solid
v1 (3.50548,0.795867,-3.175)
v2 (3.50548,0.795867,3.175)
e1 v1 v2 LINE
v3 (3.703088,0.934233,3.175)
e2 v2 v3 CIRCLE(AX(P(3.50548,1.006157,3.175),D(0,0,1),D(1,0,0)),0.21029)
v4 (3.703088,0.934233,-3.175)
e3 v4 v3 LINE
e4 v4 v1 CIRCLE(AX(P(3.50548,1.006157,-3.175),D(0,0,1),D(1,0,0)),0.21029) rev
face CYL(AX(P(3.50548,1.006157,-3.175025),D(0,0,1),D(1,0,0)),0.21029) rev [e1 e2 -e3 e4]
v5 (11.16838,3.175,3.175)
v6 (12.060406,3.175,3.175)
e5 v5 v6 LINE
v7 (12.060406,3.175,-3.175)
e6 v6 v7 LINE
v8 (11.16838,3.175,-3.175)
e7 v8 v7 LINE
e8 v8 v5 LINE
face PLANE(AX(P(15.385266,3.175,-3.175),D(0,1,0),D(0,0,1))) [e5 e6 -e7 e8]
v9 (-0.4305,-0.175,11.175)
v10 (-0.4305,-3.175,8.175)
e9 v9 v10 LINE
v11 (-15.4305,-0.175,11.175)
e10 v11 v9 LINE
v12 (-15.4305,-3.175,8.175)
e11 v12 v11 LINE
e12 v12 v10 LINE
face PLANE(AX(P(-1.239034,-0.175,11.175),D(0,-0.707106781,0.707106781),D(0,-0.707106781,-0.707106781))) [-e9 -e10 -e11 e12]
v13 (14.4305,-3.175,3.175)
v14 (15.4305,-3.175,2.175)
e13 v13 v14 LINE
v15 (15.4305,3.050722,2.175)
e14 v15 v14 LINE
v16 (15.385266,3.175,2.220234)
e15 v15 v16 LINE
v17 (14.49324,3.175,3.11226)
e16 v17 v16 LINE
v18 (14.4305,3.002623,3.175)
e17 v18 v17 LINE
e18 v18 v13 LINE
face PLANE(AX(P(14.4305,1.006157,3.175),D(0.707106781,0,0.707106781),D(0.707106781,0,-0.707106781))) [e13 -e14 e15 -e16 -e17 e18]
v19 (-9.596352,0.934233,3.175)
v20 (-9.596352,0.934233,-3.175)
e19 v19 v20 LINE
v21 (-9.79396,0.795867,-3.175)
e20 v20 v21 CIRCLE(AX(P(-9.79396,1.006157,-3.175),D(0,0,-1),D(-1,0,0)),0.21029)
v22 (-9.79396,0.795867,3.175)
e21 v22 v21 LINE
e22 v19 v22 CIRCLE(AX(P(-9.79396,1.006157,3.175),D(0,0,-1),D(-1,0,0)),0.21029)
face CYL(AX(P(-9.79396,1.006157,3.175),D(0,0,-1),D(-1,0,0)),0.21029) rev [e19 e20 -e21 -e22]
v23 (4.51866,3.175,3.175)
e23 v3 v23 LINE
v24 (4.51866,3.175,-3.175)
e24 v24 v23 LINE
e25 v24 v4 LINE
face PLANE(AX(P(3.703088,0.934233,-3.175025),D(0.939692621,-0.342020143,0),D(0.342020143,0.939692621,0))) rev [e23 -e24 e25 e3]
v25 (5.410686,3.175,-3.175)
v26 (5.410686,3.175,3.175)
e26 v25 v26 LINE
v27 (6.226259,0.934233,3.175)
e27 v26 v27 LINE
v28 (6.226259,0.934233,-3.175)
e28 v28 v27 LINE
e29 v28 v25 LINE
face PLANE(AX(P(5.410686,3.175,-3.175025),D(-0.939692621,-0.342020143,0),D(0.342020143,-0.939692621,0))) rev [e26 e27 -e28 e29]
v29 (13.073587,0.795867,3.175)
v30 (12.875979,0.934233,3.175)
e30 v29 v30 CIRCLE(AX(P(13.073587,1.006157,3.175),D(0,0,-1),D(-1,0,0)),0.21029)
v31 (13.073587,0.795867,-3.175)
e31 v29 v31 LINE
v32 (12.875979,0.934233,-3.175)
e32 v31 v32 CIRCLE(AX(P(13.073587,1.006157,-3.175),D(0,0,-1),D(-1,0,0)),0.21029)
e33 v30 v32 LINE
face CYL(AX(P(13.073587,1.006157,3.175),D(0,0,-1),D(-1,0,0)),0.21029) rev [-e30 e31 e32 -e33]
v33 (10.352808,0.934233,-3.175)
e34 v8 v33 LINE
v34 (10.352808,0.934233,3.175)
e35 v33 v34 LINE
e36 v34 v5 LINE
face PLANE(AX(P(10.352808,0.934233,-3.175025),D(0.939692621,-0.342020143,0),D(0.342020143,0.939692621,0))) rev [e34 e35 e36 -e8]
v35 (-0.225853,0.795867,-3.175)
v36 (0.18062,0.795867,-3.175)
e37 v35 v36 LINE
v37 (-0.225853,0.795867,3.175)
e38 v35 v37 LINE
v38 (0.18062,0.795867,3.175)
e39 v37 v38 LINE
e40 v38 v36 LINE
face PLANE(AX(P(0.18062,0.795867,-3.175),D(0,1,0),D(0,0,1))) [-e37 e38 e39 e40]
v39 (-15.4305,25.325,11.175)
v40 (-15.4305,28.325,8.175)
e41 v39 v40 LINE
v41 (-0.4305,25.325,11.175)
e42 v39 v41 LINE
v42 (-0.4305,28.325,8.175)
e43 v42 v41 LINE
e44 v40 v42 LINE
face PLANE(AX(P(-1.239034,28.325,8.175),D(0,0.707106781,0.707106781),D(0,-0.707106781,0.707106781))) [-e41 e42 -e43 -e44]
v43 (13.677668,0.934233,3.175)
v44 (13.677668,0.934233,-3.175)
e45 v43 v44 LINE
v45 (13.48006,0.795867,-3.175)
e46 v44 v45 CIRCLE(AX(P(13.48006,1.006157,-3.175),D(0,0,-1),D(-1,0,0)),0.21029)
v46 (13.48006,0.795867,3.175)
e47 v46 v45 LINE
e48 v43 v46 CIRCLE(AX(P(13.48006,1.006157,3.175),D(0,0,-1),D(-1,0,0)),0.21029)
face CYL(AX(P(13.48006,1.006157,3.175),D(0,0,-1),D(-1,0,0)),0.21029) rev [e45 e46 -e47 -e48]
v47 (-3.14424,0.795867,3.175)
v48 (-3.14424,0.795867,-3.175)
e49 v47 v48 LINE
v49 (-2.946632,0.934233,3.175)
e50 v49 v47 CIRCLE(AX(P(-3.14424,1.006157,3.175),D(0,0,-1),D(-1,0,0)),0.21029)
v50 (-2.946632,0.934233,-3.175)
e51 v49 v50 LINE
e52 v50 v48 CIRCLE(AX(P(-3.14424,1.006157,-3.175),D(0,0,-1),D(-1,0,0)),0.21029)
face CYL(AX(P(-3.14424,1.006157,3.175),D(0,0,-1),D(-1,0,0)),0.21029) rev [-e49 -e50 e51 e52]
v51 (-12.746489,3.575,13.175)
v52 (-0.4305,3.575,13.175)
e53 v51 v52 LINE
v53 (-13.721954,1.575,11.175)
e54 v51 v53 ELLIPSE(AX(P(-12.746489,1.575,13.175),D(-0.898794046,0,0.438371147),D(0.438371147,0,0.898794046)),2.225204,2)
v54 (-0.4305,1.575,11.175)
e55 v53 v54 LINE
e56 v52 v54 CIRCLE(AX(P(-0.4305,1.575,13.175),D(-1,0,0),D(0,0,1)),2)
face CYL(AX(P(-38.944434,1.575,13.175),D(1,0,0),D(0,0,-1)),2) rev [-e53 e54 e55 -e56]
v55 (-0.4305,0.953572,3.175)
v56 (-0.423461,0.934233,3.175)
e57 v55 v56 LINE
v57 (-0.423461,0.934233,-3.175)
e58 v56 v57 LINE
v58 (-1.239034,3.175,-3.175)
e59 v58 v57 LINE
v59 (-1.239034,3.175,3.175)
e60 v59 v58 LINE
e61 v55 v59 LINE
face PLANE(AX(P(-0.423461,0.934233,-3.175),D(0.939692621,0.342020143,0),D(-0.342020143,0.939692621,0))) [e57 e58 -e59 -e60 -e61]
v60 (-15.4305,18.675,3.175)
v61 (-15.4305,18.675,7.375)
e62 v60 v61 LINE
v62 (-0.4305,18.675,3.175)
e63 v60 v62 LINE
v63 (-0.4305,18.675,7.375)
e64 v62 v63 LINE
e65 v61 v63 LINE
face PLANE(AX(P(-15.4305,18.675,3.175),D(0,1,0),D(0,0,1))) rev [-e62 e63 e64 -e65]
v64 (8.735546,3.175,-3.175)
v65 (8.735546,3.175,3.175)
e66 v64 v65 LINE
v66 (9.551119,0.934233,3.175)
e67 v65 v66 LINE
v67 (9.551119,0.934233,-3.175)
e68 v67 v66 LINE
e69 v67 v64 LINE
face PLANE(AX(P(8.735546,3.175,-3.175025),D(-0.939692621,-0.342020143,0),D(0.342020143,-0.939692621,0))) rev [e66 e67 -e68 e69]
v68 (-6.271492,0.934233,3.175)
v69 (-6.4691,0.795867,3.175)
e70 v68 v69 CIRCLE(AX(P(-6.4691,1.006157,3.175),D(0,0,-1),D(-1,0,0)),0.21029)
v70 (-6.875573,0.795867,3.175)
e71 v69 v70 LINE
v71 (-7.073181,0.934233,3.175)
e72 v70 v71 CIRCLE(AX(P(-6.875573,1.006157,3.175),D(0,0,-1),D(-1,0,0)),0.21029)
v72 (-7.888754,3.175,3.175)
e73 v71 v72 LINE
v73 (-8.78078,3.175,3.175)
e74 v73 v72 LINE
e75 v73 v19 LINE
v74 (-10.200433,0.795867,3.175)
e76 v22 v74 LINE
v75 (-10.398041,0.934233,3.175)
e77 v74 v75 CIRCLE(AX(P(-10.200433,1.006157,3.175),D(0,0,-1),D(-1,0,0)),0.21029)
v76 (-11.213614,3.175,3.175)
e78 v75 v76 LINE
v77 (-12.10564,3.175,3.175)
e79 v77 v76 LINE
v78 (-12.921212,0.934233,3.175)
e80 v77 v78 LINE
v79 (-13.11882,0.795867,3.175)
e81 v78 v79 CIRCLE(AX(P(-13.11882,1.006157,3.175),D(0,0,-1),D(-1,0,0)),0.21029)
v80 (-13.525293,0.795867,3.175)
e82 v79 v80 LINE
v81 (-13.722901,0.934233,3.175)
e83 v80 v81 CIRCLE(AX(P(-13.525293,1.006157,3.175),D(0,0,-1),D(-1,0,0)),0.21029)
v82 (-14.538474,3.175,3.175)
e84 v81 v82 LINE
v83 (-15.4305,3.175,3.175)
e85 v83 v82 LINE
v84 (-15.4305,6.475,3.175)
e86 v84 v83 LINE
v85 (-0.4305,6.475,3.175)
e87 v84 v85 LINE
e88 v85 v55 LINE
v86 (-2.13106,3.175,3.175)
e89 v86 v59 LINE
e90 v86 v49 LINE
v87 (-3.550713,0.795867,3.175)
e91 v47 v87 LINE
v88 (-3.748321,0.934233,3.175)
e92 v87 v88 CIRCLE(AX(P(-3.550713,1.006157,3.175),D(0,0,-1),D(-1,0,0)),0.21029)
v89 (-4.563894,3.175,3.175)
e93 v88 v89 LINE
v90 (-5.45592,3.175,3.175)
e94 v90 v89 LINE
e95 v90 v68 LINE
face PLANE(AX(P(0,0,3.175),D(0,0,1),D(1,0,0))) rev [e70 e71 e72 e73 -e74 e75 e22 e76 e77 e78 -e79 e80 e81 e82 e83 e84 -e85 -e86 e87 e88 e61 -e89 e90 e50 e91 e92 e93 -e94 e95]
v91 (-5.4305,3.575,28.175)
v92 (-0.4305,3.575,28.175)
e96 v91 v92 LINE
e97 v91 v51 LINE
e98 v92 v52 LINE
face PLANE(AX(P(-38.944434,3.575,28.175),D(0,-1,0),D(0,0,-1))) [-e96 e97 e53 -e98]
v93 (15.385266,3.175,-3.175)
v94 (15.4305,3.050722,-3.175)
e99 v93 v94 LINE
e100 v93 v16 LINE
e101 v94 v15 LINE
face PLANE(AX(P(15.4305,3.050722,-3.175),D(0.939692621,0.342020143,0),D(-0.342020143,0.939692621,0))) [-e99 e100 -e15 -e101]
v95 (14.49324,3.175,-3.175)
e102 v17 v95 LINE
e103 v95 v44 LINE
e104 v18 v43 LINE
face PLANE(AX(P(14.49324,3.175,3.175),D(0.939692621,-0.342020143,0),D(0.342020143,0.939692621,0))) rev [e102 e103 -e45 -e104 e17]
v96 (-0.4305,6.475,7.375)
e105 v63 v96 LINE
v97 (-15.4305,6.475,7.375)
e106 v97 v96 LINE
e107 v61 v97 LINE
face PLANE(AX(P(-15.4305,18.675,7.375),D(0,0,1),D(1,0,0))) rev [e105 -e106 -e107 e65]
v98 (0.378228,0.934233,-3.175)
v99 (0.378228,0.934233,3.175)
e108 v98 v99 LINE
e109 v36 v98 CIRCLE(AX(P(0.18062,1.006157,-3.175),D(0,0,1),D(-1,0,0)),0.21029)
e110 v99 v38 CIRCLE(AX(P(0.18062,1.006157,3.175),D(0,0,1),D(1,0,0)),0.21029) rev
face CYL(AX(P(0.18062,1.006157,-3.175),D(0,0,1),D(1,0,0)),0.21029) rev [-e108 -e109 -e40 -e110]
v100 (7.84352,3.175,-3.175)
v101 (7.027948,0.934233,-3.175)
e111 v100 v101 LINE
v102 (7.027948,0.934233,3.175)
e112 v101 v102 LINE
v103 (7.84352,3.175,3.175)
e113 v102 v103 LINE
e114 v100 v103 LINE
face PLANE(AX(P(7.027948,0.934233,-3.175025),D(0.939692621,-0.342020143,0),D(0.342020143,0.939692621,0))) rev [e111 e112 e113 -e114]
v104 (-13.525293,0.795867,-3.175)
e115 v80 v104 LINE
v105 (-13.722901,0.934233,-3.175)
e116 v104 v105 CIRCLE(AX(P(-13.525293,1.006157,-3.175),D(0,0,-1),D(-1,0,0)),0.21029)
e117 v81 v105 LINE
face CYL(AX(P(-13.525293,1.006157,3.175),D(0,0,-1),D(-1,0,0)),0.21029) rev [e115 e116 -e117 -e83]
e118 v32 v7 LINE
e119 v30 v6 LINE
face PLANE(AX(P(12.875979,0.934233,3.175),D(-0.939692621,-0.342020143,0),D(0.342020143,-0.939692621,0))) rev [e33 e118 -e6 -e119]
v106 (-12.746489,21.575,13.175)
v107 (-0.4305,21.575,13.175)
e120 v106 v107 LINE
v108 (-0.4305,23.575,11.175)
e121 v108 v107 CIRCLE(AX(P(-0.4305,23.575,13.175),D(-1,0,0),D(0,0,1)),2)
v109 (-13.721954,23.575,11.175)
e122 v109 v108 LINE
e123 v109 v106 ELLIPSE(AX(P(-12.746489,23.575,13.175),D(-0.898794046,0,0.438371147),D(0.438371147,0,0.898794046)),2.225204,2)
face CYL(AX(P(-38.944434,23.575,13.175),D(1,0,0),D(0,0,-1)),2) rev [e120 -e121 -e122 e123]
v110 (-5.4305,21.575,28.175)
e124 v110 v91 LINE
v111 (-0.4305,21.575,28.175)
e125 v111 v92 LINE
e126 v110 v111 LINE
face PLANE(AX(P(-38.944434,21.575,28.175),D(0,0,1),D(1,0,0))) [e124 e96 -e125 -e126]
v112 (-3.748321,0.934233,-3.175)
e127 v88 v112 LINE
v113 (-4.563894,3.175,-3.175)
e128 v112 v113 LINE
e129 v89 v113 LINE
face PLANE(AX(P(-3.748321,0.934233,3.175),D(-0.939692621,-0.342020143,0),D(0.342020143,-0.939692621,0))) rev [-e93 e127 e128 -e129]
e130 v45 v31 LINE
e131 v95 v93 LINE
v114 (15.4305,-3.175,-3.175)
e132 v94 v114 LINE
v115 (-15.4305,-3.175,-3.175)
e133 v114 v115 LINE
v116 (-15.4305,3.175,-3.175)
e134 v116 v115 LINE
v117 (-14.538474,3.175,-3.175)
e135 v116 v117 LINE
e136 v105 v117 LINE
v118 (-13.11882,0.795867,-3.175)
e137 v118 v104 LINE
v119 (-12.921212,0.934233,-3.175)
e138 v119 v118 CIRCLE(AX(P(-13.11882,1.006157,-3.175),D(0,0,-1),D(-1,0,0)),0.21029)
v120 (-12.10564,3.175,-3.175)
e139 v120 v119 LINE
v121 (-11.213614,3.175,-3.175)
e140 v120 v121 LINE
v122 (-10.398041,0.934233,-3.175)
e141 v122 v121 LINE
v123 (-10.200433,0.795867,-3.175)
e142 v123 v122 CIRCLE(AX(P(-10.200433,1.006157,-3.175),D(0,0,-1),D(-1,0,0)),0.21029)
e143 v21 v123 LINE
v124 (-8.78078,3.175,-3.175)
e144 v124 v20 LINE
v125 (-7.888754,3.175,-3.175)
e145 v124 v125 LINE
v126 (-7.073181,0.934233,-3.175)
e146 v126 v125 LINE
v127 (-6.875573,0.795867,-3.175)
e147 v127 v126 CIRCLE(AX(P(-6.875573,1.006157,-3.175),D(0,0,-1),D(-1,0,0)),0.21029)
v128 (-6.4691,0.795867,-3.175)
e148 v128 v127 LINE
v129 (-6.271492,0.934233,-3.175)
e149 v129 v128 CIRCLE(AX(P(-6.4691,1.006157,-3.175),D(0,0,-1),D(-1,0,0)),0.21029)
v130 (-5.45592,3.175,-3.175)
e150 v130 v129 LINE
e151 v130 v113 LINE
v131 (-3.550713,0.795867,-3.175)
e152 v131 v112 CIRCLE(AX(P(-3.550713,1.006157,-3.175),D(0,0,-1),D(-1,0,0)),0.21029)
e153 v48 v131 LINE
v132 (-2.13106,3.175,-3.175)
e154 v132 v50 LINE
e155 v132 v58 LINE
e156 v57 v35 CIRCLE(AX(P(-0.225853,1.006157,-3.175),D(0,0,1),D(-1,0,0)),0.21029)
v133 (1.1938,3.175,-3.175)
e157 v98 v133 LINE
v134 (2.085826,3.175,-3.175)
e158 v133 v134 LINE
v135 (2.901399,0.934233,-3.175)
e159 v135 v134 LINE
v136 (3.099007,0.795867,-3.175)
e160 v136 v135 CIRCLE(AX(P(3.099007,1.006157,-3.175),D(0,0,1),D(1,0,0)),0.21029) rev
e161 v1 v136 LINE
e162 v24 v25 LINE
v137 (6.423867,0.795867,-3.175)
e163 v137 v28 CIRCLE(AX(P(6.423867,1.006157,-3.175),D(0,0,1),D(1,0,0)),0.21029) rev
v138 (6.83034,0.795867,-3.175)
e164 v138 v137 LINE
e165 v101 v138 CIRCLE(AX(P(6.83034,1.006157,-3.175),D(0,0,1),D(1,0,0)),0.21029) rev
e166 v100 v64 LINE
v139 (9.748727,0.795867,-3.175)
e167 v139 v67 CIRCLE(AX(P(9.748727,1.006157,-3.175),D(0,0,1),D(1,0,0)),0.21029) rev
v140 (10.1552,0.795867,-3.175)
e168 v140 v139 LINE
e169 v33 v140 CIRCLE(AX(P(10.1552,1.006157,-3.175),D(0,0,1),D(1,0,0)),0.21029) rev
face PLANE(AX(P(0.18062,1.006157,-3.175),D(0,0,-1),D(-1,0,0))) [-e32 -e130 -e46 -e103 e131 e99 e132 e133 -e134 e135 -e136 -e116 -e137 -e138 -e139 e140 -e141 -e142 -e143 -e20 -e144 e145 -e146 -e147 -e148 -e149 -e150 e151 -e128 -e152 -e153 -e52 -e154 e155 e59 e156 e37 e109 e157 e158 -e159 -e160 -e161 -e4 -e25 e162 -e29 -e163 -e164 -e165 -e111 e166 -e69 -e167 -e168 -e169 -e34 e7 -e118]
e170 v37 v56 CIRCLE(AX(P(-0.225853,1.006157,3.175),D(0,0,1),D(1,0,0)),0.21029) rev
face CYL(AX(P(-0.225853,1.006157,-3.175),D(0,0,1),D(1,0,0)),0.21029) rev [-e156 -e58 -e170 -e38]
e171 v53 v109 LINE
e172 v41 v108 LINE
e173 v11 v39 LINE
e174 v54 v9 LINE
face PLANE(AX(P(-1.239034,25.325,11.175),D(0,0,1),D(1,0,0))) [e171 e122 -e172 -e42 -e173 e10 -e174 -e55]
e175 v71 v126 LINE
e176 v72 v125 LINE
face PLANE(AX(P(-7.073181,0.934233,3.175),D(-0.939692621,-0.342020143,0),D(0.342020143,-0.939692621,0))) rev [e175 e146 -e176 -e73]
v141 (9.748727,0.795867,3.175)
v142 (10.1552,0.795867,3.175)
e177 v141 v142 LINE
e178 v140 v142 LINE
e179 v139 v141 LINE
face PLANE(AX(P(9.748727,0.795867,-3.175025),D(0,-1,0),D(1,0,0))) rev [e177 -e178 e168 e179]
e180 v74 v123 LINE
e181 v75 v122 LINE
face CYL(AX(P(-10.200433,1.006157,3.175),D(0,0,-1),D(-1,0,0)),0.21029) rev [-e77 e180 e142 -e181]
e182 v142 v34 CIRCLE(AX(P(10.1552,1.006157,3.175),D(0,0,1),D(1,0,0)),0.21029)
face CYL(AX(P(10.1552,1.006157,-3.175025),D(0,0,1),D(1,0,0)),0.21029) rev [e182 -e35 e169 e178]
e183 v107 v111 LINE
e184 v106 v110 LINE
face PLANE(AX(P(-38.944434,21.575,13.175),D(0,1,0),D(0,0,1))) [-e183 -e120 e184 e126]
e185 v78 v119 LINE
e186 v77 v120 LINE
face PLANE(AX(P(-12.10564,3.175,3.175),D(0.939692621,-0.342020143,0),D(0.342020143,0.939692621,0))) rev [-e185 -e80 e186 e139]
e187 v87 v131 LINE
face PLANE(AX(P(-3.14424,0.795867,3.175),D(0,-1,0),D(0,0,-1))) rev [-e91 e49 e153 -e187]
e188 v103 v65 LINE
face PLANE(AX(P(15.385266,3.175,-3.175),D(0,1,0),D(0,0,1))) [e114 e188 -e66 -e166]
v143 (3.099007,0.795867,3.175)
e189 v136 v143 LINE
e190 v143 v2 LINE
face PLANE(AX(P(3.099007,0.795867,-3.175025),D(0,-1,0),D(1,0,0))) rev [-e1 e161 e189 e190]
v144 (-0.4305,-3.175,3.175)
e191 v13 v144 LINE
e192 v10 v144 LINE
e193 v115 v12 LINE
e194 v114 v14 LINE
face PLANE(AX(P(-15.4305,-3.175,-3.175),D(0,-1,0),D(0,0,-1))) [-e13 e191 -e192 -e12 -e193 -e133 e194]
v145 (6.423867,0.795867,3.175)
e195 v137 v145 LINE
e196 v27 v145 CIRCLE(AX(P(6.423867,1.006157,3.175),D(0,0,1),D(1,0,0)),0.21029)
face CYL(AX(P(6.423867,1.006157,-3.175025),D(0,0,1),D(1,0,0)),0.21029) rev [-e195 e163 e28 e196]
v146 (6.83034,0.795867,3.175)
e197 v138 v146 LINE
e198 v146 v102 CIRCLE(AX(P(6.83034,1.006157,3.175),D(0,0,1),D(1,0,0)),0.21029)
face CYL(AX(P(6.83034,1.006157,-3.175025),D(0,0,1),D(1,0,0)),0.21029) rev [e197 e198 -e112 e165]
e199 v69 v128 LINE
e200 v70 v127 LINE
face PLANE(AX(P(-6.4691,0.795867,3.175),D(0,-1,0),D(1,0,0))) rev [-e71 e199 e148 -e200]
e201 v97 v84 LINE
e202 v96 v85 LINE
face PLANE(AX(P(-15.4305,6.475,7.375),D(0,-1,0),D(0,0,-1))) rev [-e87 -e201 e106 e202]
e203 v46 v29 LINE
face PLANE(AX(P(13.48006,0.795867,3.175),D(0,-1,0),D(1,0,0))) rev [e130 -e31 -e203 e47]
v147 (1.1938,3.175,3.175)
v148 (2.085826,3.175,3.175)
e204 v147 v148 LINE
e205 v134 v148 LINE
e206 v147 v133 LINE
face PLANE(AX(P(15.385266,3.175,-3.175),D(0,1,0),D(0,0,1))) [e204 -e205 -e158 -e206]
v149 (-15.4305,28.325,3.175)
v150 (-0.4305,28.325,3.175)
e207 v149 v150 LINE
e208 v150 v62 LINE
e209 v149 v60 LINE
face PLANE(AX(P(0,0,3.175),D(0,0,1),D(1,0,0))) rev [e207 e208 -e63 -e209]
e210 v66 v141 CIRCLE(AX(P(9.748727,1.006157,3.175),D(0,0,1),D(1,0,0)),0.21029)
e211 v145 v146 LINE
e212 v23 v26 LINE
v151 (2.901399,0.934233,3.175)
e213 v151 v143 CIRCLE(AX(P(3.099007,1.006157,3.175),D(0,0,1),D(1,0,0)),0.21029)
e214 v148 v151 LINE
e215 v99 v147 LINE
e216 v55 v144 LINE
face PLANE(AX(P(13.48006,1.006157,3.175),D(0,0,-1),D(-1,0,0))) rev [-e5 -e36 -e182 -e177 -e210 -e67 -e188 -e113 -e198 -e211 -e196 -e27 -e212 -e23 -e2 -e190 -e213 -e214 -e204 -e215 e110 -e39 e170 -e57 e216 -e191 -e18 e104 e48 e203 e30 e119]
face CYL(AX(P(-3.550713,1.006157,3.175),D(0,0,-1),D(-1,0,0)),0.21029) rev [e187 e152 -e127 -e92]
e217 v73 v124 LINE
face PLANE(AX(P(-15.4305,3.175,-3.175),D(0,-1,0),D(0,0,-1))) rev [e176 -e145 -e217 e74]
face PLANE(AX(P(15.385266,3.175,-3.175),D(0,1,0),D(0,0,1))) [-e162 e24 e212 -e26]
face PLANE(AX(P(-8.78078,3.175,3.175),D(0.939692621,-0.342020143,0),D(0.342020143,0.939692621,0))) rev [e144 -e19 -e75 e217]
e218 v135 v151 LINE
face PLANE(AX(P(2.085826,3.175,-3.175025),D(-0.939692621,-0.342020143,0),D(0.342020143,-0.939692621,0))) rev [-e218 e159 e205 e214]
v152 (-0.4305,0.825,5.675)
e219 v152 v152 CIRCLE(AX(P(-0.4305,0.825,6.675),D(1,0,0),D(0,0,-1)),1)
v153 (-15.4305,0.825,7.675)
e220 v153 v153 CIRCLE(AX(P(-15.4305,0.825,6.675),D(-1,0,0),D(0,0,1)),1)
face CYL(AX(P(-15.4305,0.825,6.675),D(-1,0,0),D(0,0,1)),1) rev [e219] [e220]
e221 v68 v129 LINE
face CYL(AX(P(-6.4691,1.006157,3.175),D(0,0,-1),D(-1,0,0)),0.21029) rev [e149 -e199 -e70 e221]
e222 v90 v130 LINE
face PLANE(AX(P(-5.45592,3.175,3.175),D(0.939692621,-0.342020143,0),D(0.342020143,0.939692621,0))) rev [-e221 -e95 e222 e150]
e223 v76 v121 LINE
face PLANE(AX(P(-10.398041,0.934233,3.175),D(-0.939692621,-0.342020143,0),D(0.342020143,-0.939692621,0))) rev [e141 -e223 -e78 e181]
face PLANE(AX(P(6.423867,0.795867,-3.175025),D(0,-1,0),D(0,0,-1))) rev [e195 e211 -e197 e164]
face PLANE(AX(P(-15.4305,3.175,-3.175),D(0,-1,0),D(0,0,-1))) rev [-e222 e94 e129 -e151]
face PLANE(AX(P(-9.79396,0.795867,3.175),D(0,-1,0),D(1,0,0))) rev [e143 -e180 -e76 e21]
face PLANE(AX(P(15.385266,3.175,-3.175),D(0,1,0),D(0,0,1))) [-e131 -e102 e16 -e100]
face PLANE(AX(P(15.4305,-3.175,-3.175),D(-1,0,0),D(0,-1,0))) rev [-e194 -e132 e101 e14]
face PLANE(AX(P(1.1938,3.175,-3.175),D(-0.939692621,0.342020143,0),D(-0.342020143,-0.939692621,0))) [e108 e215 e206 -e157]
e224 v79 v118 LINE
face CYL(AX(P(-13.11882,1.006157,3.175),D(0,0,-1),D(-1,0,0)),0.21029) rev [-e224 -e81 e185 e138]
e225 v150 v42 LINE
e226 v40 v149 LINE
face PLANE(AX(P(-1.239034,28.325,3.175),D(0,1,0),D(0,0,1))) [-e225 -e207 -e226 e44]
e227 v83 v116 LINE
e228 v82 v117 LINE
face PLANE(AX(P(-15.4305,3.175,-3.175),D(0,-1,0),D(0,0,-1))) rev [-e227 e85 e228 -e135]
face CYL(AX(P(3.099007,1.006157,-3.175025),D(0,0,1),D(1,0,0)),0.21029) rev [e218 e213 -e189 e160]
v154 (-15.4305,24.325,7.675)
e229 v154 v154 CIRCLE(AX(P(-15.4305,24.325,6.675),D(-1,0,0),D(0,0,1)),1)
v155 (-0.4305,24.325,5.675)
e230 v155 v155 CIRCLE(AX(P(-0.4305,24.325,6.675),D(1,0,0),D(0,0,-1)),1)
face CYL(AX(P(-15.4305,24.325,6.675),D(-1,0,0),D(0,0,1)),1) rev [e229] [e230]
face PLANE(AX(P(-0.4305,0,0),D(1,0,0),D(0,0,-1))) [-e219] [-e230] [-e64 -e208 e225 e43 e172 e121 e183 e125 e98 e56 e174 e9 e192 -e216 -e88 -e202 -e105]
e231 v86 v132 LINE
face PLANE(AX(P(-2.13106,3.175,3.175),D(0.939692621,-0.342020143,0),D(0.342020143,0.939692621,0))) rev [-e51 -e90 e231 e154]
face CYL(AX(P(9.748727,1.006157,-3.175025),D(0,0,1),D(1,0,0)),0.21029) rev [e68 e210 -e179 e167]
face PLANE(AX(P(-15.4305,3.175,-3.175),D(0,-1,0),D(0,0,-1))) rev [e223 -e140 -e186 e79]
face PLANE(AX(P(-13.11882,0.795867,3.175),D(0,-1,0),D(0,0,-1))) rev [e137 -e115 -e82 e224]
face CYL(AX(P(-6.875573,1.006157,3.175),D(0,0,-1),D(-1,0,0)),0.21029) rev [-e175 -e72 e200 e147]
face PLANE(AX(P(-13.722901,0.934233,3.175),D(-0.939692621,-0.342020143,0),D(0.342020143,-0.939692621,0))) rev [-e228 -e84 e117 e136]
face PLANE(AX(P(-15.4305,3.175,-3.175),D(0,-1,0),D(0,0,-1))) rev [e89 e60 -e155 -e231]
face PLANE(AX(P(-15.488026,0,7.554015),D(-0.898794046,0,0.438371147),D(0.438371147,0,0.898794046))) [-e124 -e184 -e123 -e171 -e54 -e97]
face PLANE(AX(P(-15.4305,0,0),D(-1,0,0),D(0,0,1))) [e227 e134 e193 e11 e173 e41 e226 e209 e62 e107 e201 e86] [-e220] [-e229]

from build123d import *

# Parameters (mm, degrees)
BOSS_EXTRUDE1_START       = -0.808533663
BOSS_EXTRUDE1_DEPTH       = 0.808533663
BOSS_EXTRUDE1_START_2     = 0.611119732
BOSS_EXTRUDE1_2_OUTLINE_W = 1
BOSS_EXTRUDE1_2_OUTLINE_H = 6.35
BOSS_EXTRUDE1_2_DEPTH     = 15.249880268
BOSS_EXTRUDE1_3_OUTLINE_W = 1
BOSS_EXTRUDE1_3_OUTLINE_H = 3.970866667
BOSS_EXTRUDE1_3_DEPTH     = 0.80872757
BOSS_EXTRUDE1_4_OUTLINE_W = 1
BOSS_EXTRUDE1_4_OUTLINE_H = 2.379133333
BOSS_EXTRUDE1_4_DEPTH     = 0.204646605
BOSS_EXTRUDE1_START_3     = 2.175
BOSS_EXTRUDE1_5_DEPTH     = 6
BOSS_EXTRUDE1_START_4     = 12.448968436
BOSS_EXTRUDE1_6_OUTLINE_W = 5
BOSS_EXTRUDE1_6_OUTLINE_H = 8.175
BOSS_EXTRUDE1_6_DEPTH     = 1.551031564
BOSS_EXTRUDE2_START       = 5.35
BOSS_EXTRUDE2_DEPTH       = 5.35
CUT_EXTRUDE1_DEPTH        = 6.35
BOSS_EXTRUDE3_DEPTH       = 14.191466337
BOSS_EXTRUDE4_REACH       = 36.333
CUT_EXTRUDE2_DEPTH        = 6.35
CUT_EXTRUDE3_DEPTH        = 6.35
CUT_EXTRUDE4_DEPTH        = 6.35
CUT_EXTRUDE5_DEPTH        = 6.35
CUT_EXTRUDE6_DEPTH        = 6.35
CUT_EXTRUDE7_DEPTH        = 41.809385627
CUT_EXTRUDE8_DEPTH        = 41.809385627
CUT_EXTRUDE9_DEPTH        = 41.809385627
SKETCH15_W                = 4.2
SKETCH15_H                = 12.2
CUT_EXTRUDE10_DEPTH       = 43.984969129
F_3_CLEARANCE_HOLE1_D     = 2
F_3_CLEARANCE_HOLE1_DEPTH = 30.861103078


with BuildPart() as part:
    # Boss-Extrude1: read off the stored shape, not the designer's step
    # Boss-Extrude1 outline → Boss-Extrude1 (new body)
    with BuildSketch(Plane(origin=(-0.4305, 0, 0), x_dir=(0, 0, -1), z_dir=(1, 0, 0)).offset(BOSS_EXTRUDE1_START)):
        Polygon((-11.175, -0.175), (-8.175, -3.175), (-2.175, -3.175), (-2.175, 28.325), (-8.175, 28.325), (-11.175, 25.325), align=None)
    extrude(amount=BOSS_EXTRUDE1_DEPTH)



with BuildPart() as body_2:
    # Boss-Extrude1 2 outline → Boss-Extrude1 2 (new body)
    with BuildSketch(Plane(origin=(-0.4305, 0, 0), x_dir=(0, 0, -1), z_dir=(1, 0, 0)).offset(BOSS_EXTRUDE1_START_2)):
        with Locations((-2.675, 0)):
            Rectangle(BOSS_EXTRUDE1_2_OUTLINE_W, BOSS_EXTRUDE1_2_OUTLINE_H)
    extrude(amount=BOSS_EXTRUDE1_2_DEPTH)


with BuildPart() as part_1:
    add(part.part)

    add(body_2.part)  # Boss-Extrude1 3 merges body 2
    # Boss-Extrude1 3 outline → Boss-Extrude1 3 (add)
    with BuildSketch(Plane(origin=(-0.4305, 0, 0), x_dir=(0, 0, -1), z_dir=(1, 0, 0))):
        with Locations((-2.675, -1.189566667)):
            Rectangle(BOSS_EXTRUDE1_3_OUTLINE_W, BOSS_EXTRUDE1_3_OUTLINE_H)
    extrude(amount=BOSS_EXTRUDE1_3_DEPTH)

    # Boss-Extrude1 4 outline → Boss-Extrude1 4 (add)
    with BuildSketch(Plane(origin=(-0.4305, 0, 0), x_dir=(0, 0, -1), z_dir=(1, 0, 0))):
        with Locations((-2.675, 1.985433334)):
            Rectangle(BOSS_EXTRUDE1_4_OUTLINE_W, BOSS_EXTRUDE1_4_OUTLINE_H)
    extrude(amount=BOSS_EXTRUDE1_4_DEPTH)

    # Boss-Extrude1 5 outline → Boss-Extrude1 5 (cut)
    with BuildSketch(Plane.XY.offset(BOSS_EXTRUDE1_START_3)):
        with BuildLine():
            Line((0.37822757, 0.934233164), (1.1938, 3.175))
            Line((1.1938, 3.175), (0.180619732, 3.175))
            Line((0.180619732, 3.175), (0.180619732, 0.795866667))
            ThreePointArc((0.180619732, 0.795866667), (0.301237045, 0.83389716), (0.37822757, 0.934233164))
        make_face()
        Polygon((15.385266337, 3.175), (15.4305, 3.050721534), (15.4305, 3.175), align=None)
        with BuildLine():
            Line((-0.4305, 0.953572019), (-0.423461232, 0.934233164))
            ThreePointArc((-0.423461232, 0.934233164), (-0.346470708, 0.83389716), (-0.225853395, 0.795866667))
            Line((-0.225853395, 0.795866667), (-0.225853395, 3.175))
            Line((-0.225853395, 3.175), (-0.4305, 3.175))
            Line((-0.4305, 3.175), (-0.4305, 0.953572019))
        make_face()
    extrude(amount=BOSS_EXTRUDE1_5_DEPTH, mode=Mode.SUBTRACT)

    # Boss-Extrude1 6 outline → Boss-Extrude1 6 (cut)
    with BuildSketch(Plane(origin=(0, 0, 0), x_dir=(0.707106781186545, 0, -0.70710678118655), z_dir=(0.70710678118655, 0, 0.707106781186545)).offset(BOSS_EXTRUDE1_START_4)):
        with Locations((8.5, 0.9125)):
            Rectangle(BOSS_EXTRUDE1_6_OUTLINE_W, BOSS_EXTRUDE1_6_OUTLINE_H)
    extrude(amount=BOSS_EXTRUDE1_6_DEPTH, mode=Mode.SUBTRACT)

    # Sketch2 → Boss-Extrude2 (add)
    with BuildSketch(Plane(origin=(0, 0, 2.175), x_dir=(-1, 0, 0), z_dir=(0, 0, -1)).offset(BOSS_EXTRUDE2_START)):
        with BuildLine():
            Line((1.239033663, -3.175), (-15.4305, -3.175))
            Line((-15.4305, -3.175), (-15.4305, 3.050721534))
            Line((-15.4305, 3.050721534), (-15.385266337, 3.175))
            Line((-15.385266337, 3.175), (-1.1938, 3.175))
            Line((-1.1938, 3.175), (-0.37822757, 0.934233164))
            ThreePointArc((-0.37822757, 0.934233164), (-0.301237046, 0.83389716), (-0.180619732, 0.795866667))
            Line((-0.180619732, 0.795866667), (0.225853395, 0.795866667))
            ThreePointArc((0.225853395, 0.795866667), (0.346470708, 0.83389716), (0.423461232, 0.934233164))
            Line((0.423461232, 0.934233164), (0.4305, 0.953572019))
            Line((0.4305, 0.953572019), (0.4305, 28.325))
            Line((0.4305, 28.325), (1.239033663, 28.325))
            Line((1.239033663, 28.325), (1.239033663, -3.175))
        make_face()
    extrude(amount=-BOSS_EXTRUDE2_DEPTH)

    # Sketch3 → Cut-Extrude1 (cut)
    with BuildSketch(Plane(origin=(0, 0, -3.175), x_dir=(-1, 0, 0), z_dir=(0, 0, -1))):
        Polygon((0.4305, 0.953572019), (1.239033663, 3.175), (1.239033663, 28.325), (0.4305, 28.325), align=None)
    extrude(amount=-CUT_EXTRUDE1_DEPTH, mode=Mode.SUBTRACT)

    # Sketch4 → Boss-Extrude3 (add)
    with BuildSketch(Plane.ZY.offset(1.239033663)):
        Polygon((3.175, 3.175), (3.175, 28.325), (8.175, 28.325), (11.175, 25.325), (11.175, -0.175), (8.175, -3.175), (-3.175, -3.175), (-3.175, 3.175), align=None)
    extrude(amount=BOSS_EXTRUDE3_DEPTH)

    # Boss-Extrude4: up to this plane
    boss_extrude4_end = Plane(origin=(-15.488026312, 0, 7.554015165), z_dir=(-0.8987940462991697, 0, 0.438371146789072))
    # Sketch6 → Boss-Extrude4 (add, up to the surface)
    with BuildSketch(Plane(origin=(-0.4305, 0, 0), x_dir=(0, 0, -1), z_dir=(1, 0, 0)), mode=Mode.PRIVATE) as boss_extrude4_sk1:
        with BuildLine():
            Line((-11.175, 1.575), (-11.175, 23.575))
            ThreePointArc((-11.175, 23.575), (-11.760786438, 22.160786438), (-13.175, 21.575))
            Line((-13.175, 21.575), (-28.175, 21.575))
            Line((-28.175, 21.575), (-28.175, 3.575))
            Line((-28.175, 3.575), (-13.175, 3.575))
            ThreePointArc((-13.175, 3.575), (-11.760786438, 2.989213562), (-11.175, 1.575))
        make_face()
    boss_extrude4_tool1 = split(extrude(boss_extrude4_sk1.sketch, amount=-BOSS_EXTRUDE4_REACH, mode=Mode.PRIVATE), bisect_by=boss_extrude4_end, keep=Keep.BOTH, mode=Mode.PRIVATE)
    add(boss_extrude4_tool1.solids().sort_by_distance((-0.4305, 12.575, 19.630069))[0])

    # Sketch7 → Cut-Extrude2 (cut)
    with BuildSketch(Plane(origin=(0, 0, -3.175), x_dir=(-1, 0, 0), z_dir=(0, 0, -1))):
        with BuildLine():
            Line((2.13106, 3.175), (2.94663243, 0.934233164))
            ThreePointArc((2.94663243, 0.934233164), (3.023622954, 0.83389716), (3.144240268, 0.795866667))
            Line((3.144240268, 0.795866667), (3.550713395, 0.795866667))
            ThreePointArc((3.550713395, 0.795866667), (3.671330708, 0.83389716), (3.748321232, 0.934233164))
            Line((3.748321232, 0.934233164), (4.563893663, 3.175))
            Line((4.563893663, 3.175), (2.13106, 3.175))
        make_face()
    extrude(amount=-CUT_EXTRUDE2_DEPTH, mode=Mode.SUBTRACT)

    # Sketch8 → Cut-Extrude3 (cut)
    with BuildSketch(Plane(origin=(0, 0, -3.175), x_dir=(-1, 0, 0), z_dir=(0, 0, -1))):
        with BuildLine():
            Line((5.45592, 3.175), (6.27149243, 0.934233164))
            ThreePointArc((6.27149243, 0.934233164), (6.348482954, 0.83389716), (6.469100268, 0.795866667))
            Line((6.469100268, 0.795866667), (6.875573395, 0.795866667))
            ThreePointArc((6.875573395, 0.795866667), (6.996190708, 0.83389716), (7.073181232, 0.934233164))
            Line((7.073181232, 0.934233164), (7.888753663, 3.175))
            Line((7.888753663, 3.175), (5.45592, 3.175))
        make_face()
    extrude(amount=-CUT_EXTRUDE3_DEPTH, mode=Mode.SUBTRACT)

    # Sketch9 → Cut-Extrude4 (cut)
    with BuildSketch(Plane(origin=(0, 0, -3.175), x_dir=(-1, 0, 0), z_dir=(0, 0, -1))):
        with BuildLine():
            Line((8.78078, 3.175), (9.59635243, 0.934233164))
            ThreePointArc((9.59635243, 0.934233164), (9.673342954, 0.83389716), (9.793960268, 0.795866667))
            Line((9.793960268, 0.795866667), (10.200433395, 0.795866667))
            ThreePointArc((10.200433395, 0.795866667), (10.321050708, 0.83389716), (10.398041232, 0.934233164))
            Line((10.398041232, 0.934233164), (11.213613663, 3.175))
            Line((11.213613663, 3.175), (8.78078, 3.175))
        make_face()
    extrude(amount=-CUT_EXTRUDE4_DEPTH, mode=Mode.SUBTRACT)

    # Sketch10 → Cut-Extrude5 (cut)
    with BuildSketch(Plane(origin=(0, 0, -3.175), x_dir=(-1, 0, 0), z_dir=(0, 0, -1))):
        with BuildLine():
            Line((12.10564, 3.175), (12.92121243, 0.934233164))
            ThreePointArc((12.92121243, 0.934233164), (12.998202954, 0.83389716), (13.118820268, 0.795866667))
            Line((13.118820268, 0.795866667), (13.525293395, 0.795866667))
            ThreePointArc((13.525293395, 0.795866667), (13.645910708, 0.83389716), (13.722901232, 0.934233164))
            Line((13.722901232, 0.934233164), (14.538473663, 3.175))
            Line((14.538473663, 3.175), (12.10564, 3.175))
        make_face()
    extrude(amount=-CUT_EXTRUDE5_DEPTH, mode=Mode.SUBTRACT)

    # Sketch11 → Cut-Extrude6 (cut)
    with BuildSketch(Plane(origin=(0, 0, -3.175), x_dir=(-1, 0, 0), z_dir=(0, 0, -1))):
        with BuildLine():
            Line((-12.060406337, 3.175), (-14.49324, 3.175))
            Line((-14.49324, 3.175), (-13.67766757, 0.934233164))
            ThreePointArc((-13.67766757, 0.934233164), (-13.600677046, 0.83389716), (-13.480059732, 0.795866667))
            Line((-13.480059732, 0.795866667), (-13.073586605, 0.795866667))
            ThreePointArc((-13.073586605, 0.795866667), (-12.952969292, 0.83389716), (-12.875978768, 0.934233164))
            Line((-12.875978768, 0.934233164), (-12.060406337, 3.175))
        make_face()
    extrude(amount=-CUT_EXTRUDE6_DEPTH, mode=Mode.SUBTRACT)

    # Sketch12 → Cut-Extrude7 (cut, through all)
    with BuildSketch(Plane.XY.offset(3.175)):
        with BuildLine():
            Line((2.085826337, 3.175), (2.901398768, 0.934233164))
            ThreePointArc((2.901398768, 0.934233164), (2.978389292, 0.83389716), (3.099006605, 0.795866667))
            Line((3.099006605, 0.795866667), (3.505479732, 0.795866667))
            ThreePointArc((3.505479732, 0.795866667), (3.626097046, 0.83389716), (3.70308757, 0.934233164))
            Line((3.70308757, 0.934233164), (4.51866, 3.175))
            Line((4.51866, 3.175), (2.085826337, 3.175))
        make_face()
    extrude(amount=-CUT_EXTRUDE7_DEPTH, mode=Mode.SUBTRACT)

    # Sketch13 → Cut-Extrude8 (cut, through all)
    with BuildSketch(Plane.XY.offset(3.175)):
        with BuildLine():
            Line((5.410686337, 3.175), (6.226258768, 0.934233164))
            ThreePointArc((6.226258768, 0.934233164), (6.303249292, 0.83389716), (6.423866605, 0.795866667))
            Line((6.423866605, 0.795866667), (6.830339732, 0.795866667))
            ThreePointArc((6.830339732, 0.795866667), (6.950957046, 0.83389716), (7.02794757, 0.934233164))
            Line((7.02794757, 0.934233164), (7.84352, 3.175))
            Line((7.84352, 3.175), (5.410686337, 3.175))
        make_face()
    extrude(amount=-CUT_EXTRUDE8_DEPTH, mode=Mode.SUBTRACT)

    # Sketch14 → Cut-Extrude9 (cut, through all)
    with BuildSketch(Plane.XY.offset(3.175)):
        with BuildLine():
            Line((8.735546337, 3.175), (9.551118768, 0.934233164))
            ThreePointArc((9.551118768, 0.934233164), (9.628109292, 0.83389716), (9.748726605, 0.795866667))
            Line((9.748726605, 0.795866667), (10.155199732, 0.795866667))
            ThreePointArc((10.155199732, 0.795866667), (10.275817046, 0.83389716), (10.35280757, 0.934233164))
            Line((10.35280757, 0.934233164), (11.16838, 3.175))
            Line((11.16838, 3.175), (8.735546337, 3.175))
        make_face()
    extrude(amount=-CUT_EXTRUDE9_DEPTH, mode=Mode.SUBTRACT)

    # Sketch15 → Cut-Extrude10 (cut, through all)
    with BuildSketch(Plane(origin=(-0.4305, 0, 0), x_dir=(0, 0, -1), z_dir=(1, 0, 0))):
        with Locations((-5.275, 12.575)):
            Rectangle(SKETCH15_W, SKETCH15_H)
    extrude(amount=-CUT_EXTRUDE10_DEPTH, mode=Mode.SUBTRACT)

    # #3 Clearance Hole1
    with Locations(Plane.ZY.offset(15.4305)):
        with Locations((6.675, 24.325), (6.675, 0.825)):
            Hole(F_3_CLEARANCE_HOLE1_D / 2, depth=F_3_CLEARANCE_HOLE1_DEPTH)


solid = part_1.part
